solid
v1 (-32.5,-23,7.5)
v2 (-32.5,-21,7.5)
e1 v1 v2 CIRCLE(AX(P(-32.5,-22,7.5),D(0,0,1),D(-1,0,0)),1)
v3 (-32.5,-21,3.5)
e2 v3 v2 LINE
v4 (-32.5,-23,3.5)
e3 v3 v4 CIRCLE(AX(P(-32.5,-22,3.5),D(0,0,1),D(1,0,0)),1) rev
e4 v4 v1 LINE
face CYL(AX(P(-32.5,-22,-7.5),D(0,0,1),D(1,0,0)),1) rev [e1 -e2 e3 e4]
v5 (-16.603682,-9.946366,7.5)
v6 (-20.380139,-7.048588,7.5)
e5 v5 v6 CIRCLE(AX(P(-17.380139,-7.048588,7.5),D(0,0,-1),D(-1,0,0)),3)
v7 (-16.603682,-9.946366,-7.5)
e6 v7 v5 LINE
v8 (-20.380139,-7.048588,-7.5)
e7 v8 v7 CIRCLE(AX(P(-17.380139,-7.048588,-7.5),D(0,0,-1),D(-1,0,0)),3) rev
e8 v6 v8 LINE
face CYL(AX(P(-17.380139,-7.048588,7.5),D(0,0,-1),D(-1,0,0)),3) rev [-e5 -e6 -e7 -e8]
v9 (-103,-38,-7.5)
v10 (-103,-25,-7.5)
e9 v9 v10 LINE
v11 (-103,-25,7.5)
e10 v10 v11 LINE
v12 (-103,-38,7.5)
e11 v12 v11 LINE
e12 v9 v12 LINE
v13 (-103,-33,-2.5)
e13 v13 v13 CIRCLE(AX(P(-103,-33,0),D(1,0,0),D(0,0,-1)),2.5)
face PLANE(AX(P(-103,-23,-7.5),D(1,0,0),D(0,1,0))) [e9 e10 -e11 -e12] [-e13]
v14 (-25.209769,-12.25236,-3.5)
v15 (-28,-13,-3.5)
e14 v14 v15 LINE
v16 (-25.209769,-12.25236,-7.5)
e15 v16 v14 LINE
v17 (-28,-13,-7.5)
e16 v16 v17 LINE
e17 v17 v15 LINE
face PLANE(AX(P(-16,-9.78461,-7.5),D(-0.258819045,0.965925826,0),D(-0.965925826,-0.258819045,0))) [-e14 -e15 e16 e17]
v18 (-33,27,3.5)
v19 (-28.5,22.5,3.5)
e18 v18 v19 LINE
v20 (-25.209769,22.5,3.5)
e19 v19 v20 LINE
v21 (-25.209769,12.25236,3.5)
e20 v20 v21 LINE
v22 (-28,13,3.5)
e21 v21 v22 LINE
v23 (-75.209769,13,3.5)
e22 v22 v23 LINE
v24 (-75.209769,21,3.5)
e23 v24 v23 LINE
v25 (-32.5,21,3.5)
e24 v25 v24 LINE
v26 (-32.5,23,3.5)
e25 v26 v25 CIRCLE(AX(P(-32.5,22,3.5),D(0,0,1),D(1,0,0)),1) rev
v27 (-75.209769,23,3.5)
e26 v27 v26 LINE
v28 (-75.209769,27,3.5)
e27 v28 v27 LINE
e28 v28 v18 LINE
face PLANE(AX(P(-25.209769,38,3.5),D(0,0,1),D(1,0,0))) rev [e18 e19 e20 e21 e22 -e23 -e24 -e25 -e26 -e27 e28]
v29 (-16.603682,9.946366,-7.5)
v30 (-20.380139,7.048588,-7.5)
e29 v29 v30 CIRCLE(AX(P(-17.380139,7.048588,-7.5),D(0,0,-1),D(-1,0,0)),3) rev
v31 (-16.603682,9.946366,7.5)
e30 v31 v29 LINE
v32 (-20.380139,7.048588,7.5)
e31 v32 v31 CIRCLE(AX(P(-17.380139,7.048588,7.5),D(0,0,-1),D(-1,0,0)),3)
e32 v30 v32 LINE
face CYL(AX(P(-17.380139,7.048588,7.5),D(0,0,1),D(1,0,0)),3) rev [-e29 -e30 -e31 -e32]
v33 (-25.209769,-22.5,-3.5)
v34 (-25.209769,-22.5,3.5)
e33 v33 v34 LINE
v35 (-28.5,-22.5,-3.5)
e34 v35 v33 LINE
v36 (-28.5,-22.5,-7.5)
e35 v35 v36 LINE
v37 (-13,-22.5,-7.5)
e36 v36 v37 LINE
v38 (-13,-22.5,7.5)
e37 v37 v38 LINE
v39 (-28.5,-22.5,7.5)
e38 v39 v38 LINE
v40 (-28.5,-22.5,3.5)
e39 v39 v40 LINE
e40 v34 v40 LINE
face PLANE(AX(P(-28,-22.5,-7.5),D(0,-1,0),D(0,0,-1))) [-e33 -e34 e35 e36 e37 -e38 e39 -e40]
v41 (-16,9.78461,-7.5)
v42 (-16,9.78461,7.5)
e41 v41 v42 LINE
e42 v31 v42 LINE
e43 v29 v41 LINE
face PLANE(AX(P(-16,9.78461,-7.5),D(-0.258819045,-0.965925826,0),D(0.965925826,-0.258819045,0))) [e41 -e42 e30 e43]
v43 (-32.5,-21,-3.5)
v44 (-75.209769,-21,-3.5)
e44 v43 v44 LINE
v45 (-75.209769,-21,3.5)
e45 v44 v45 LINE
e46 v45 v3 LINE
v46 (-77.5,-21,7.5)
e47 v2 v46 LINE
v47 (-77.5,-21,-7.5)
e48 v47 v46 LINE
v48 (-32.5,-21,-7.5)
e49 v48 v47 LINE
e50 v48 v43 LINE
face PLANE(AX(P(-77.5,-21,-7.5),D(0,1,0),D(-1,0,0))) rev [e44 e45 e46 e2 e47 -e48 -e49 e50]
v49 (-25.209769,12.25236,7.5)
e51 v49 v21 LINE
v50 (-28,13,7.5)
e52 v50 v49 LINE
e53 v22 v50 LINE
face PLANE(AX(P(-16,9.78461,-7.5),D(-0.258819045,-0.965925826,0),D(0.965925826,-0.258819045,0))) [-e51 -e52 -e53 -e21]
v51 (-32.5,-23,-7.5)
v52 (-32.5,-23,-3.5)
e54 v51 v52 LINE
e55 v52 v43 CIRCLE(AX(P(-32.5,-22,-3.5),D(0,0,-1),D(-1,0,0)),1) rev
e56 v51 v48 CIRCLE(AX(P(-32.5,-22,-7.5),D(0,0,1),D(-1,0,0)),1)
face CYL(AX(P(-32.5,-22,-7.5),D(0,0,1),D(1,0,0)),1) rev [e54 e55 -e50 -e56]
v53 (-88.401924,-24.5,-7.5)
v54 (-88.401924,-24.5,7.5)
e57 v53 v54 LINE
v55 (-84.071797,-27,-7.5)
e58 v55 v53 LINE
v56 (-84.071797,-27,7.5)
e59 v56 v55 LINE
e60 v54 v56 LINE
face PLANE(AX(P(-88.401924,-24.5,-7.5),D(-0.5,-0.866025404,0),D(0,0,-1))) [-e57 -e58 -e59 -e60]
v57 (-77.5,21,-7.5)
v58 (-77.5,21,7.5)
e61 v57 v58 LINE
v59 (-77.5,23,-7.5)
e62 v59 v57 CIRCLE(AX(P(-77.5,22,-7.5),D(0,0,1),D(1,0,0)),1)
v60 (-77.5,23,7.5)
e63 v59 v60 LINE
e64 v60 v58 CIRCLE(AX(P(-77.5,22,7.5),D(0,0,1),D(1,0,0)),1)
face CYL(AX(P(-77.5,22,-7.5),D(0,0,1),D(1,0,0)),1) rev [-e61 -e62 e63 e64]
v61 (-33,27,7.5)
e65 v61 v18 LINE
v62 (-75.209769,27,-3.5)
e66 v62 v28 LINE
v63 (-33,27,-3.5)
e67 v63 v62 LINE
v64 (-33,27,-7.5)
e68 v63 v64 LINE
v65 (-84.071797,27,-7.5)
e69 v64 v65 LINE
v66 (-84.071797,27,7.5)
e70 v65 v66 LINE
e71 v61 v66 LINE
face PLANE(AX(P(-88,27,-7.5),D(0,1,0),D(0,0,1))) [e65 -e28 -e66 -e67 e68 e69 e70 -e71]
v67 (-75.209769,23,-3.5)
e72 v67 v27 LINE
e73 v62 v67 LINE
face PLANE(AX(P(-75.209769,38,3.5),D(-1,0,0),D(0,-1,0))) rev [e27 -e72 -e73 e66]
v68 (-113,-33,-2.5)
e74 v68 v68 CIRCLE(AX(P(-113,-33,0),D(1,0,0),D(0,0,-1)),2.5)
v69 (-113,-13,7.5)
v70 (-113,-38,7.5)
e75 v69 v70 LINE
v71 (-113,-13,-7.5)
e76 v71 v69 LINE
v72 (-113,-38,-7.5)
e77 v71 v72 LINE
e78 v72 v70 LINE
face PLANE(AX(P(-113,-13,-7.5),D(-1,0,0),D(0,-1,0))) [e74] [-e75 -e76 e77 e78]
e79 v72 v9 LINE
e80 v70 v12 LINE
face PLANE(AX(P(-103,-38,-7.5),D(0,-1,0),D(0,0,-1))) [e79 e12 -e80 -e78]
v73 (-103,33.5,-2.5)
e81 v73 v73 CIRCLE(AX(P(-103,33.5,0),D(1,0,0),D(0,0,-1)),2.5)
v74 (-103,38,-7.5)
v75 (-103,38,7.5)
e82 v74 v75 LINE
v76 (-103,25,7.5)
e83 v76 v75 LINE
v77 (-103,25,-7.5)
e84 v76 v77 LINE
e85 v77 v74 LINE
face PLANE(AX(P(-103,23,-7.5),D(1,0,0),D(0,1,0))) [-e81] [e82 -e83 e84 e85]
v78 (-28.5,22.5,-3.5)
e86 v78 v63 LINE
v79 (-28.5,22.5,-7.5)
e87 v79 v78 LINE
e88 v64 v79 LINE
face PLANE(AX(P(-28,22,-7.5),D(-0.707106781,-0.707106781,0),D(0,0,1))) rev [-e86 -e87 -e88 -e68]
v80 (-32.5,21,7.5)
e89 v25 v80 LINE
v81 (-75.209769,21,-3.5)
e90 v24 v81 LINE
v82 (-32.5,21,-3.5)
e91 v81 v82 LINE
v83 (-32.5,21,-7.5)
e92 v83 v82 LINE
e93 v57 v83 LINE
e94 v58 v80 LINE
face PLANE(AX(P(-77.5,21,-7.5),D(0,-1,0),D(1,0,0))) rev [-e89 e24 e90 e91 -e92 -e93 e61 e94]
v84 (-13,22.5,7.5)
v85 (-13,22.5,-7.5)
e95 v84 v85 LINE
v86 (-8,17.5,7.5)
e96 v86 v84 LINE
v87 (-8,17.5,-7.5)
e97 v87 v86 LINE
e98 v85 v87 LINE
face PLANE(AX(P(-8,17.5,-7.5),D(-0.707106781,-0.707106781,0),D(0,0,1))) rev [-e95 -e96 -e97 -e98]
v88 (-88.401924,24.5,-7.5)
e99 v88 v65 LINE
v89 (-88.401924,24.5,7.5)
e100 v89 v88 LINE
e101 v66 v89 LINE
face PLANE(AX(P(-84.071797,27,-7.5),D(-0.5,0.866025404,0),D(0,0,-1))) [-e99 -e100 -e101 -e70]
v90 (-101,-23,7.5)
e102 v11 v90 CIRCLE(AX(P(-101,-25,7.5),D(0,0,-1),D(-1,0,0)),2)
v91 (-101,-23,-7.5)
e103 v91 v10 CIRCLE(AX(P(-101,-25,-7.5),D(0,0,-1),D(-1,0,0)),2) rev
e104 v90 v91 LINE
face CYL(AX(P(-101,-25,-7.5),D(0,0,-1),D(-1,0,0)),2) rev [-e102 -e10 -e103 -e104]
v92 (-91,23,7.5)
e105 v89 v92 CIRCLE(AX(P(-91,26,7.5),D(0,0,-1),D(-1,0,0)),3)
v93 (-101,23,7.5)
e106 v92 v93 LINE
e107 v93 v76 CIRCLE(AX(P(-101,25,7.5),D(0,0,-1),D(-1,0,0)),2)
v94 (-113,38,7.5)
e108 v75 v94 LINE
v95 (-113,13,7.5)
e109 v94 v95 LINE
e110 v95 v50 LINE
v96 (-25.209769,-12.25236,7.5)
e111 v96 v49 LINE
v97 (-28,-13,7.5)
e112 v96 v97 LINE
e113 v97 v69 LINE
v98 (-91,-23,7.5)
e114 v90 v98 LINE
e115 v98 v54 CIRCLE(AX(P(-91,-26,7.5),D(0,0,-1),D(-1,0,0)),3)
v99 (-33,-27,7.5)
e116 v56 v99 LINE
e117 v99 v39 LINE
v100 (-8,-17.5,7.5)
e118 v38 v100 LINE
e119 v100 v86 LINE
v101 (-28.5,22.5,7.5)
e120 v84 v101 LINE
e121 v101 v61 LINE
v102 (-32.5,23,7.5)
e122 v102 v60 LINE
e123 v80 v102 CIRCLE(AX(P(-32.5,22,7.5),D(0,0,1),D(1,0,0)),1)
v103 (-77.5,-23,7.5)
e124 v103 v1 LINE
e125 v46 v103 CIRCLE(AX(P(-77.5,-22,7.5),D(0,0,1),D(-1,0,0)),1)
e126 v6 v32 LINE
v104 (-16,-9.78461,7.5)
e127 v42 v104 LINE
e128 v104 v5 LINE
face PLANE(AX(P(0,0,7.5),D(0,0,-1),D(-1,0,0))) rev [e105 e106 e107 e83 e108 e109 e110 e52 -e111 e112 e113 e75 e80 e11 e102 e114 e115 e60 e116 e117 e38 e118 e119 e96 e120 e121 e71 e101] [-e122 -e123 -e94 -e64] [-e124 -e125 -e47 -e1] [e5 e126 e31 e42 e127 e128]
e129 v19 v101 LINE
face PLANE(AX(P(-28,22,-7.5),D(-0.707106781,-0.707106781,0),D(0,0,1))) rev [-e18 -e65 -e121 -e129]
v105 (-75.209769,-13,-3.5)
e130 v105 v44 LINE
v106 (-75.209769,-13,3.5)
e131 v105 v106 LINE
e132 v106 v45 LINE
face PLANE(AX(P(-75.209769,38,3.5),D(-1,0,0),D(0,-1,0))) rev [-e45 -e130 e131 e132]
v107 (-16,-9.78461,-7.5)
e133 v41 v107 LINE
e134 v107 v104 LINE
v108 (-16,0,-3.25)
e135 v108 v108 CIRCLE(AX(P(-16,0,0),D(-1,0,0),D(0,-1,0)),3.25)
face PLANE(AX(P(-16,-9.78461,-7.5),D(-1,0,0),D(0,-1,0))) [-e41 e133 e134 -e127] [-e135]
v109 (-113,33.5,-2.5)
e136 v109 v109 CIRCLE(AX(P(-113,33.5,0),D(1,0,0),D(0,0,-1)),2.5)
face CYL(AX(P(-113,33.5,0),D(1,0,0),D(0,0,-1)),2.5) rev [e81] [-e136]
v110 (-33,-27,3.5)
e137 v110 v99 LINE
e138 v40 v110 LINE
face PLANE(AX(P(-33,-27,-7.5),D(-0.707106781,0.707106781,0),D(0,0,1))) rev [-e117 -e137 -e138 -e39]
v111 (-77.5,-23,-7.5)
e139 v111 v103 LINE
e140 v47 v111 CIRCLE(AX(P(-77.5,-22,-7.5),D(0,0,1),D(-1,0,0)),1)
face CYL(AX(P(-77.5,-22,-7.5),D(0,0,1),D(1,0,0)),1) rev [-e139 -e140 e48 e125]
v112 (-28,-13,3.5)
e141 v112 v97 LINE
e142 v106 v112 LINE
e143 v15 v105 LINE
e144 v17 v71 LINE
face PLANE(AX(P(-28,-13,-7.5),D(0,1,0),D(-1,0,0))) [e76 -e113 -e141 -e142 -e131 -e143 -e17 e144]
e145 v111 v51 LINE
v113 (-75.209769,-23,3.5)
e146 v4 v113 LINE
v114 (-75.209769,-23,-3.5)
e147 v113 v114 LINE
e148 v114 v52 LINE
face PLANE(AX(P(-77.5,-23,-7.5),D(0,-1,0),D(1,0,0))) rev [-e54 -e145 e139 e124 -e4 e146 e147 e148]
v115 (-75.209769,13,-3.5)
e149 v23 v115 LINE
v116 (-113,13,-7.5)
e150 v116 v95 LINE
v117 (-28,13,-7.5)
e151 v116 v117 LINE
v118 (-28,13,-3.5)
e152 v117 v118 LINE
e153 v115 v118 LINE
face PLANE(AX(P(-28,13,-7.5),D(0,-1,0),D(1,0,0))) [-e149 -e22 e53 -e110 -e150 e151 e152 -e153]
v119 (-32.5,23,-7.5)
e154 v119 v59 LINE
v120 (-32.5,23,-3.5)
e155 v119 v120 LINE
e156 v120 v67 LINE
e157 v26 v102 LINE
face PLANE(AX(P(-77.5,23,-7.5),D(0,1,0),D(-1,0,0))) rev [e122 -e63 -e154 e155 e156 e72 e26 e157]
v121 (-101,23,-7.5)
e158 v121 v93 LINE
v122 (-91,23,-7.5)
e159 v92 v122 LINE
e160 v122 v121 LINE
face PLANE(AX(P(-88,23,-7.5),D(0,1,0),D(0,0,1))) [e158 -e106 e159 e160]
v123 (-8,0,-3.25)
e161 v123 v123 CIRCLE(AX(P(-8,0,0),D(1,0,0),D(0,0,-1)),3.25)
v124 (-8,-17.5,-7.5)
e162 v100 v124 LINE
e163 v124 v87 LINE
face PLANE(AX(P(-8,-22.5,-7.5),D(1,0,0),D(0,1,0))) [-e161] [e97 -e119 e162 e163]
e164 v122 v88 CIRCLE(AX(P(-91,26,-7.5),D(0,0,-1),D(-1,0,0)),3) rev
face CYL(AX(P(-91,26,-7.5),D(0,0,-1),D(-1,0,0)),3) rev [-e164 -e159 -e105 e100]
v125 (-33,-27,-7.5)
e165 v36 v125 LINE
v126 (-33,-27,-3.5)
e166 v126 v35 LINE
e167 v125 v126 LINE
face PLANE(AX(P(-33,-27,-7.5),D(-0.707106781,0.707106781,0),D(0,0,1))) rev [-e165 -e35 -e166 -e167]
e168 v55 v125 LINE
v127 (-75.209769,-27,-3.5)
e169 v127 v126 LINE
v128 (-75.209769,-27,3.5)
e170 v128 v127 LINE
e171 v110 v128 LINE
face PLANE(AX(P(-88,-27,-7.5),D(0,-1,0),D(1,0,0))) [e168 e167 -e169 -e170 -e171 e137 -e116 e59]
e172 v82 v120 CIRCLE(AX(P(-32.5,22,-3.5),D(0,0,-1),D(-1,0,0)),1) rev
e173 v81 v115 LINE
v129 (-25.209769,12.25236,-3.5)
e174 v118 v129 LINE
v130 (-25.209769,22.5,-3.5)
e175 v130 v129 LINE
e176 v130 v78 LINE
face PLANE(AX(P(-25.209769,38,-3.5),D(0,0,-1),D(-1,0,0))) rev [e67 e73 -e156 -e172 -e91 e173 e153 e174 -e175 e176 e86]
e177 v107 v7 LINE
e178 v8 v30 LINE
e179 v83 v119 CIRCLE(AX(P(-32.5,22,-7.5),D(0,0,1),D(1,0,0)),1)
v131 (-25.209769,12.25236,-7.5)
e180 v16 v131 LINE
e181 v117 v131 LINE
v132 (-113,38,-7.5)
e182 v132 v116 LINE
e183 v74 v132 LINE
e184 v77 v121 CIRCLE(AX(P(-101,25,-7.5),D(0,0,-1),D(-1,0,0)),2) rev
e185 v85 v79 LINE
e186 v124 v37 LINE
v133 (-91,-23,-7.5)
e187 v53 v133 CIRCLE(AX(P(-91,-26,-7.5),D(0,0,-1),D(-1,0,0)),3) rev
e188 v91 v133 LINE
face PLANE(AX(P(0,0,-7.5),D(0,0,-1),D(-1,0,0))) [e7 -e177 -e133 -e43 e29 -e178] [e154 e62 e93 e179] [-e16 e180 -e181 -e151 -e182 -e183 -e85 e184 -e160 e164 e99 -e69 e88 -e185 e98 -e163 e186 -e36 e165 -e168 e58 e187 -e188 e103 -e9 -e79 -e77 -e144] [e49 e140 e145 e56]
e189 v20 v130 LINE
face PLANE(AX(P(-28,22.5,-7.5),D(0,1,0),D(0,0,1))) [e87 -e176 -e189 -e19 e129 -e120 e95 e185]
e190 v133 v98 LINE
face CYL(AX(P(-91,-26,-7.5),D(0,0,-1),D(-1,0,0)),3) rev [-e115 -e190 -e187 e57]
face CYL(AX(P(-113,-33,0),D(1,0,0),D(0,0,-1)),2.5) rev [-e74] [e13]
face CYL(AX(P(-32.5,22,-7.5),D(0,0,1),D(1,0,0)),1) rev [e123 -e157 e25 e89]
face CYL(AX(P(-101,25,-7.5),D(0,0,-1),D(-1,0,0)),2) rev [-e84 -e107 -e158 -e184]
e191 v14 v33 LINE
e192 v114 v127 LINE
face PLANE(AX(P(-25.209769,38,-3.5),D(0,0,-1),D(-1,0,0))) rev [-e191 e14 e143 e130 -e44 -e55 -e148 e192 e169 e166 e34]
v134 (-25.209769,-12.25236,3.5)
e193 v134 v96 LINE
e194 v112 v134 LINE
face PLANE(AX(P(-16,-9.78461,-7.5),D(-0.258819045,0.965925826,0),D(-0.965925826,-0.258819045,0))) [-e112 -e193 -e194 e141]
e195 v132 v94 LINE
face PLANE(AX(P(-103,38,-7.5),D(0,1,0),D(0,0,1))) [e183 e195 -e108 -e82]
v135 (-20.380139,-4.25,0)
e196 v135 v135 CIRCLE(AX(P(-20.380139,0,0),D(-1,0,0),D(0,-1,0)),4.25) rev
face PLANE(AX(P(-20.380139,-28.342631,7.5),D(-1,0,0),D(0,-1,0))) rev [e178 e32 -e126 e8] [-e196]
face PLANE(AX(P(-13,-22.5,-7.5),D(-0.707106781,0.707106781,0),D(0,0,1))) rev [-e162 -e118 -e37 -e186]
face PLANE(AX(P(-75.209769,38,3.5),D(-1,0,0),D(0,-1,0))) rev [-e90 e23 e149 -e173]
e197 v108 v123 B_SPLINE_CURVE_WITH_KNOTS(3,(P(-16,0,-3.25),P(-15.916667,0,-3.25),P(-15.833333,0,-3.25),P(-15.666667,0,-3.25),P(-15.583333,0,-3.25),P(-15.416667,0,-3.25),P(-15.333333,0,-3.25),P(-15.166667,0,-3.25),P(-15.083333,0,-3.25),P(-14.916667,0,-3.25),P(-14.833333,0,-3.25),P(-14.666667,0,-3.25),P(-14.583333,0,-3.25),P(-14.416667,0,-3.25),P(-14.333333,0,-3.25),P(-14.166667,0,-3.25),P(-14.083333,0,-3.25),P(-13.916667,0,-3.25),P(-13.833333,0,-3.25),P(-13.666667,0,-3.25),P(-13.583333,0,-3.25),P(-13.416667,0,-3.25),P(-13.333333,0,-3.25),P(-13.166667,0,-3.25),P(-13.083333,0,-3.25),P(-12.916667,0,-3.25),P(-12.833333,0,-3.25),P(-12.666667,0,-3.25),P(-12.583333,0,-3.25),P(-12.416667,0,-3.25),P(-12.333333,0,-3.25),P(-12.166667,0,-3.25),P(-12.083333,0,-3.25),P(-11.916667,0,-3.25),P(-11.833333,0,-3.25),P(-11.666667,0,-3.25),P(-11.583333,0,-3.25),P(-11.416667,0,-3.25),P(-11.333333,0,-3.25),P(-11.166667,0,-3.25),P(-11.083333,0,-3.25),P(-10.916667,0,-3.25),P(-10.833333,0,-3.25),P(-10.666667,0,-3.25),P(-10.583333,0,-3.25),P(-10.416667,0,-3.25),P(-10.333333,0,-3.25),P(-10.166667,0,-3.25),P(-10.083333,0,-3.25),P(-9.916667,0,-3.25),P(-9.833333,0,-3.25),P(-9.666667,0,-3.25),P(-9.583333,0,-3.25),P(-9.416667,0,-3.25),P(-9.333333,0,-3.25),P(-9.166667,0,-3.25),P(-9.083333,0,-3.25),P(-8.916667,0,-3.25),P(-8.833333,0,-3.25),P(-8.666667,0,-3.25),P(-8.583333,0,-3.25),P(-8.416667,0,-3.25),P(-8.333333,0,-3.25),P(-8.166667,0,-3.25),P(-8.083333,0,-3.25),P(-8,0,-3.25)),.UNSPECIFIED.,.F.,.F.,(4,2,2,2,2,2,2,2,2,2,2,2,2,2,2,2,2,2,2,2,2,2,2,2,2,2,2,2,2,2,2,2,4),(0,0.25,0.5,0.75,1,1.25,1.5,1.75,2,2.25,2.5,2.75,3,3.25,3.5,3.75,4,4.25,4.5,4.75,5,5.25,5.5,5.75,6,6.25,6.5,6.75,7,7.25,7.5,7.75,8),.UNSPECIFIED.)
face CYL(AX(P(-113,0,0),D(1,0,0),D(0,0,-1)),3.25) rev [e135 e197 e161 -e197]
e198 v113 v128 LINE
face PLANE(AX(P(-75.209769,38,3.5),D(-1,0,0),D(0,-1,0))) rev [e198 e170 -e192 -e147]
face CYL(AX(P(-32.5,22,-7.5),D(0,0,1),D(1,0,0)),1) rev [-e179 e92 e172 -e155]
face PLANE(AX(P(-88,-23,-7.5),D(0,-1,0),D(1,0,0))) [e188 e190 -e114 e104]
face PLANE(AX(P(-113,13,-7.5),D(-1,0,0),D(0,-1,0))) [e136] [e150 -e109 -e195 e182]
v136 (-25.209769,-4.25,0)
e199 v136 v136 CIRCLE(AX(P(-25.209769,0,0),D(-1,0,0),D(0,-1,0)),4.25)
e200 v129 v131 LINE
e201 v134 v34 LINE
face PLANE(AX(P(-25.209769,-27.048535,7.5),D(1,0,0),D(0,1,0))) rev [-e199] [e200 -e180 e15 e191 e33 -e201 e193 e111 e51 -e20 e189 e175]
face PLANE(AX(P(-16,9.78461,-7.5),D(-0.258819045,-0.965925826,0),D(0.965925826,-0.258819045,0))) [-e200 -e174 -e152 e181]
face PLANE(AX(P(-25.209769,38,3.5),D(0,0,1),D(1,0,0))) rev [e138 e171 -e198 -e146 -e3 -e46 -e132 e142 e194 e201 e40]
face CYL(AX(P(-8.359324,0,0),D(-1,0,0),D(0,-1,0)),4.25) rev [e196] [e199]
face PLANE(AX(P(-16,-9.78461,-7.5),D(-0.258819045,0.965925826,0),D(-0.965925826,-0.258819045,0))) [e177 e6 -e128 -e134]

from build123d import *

# Parameters (mm, degrees)
BOSS_EXTRUDE1_DEPTH     = 7.5
SKETCH2_R               = 3.25
CUT_EXTRUDE1_DEPTH      = 112.91626334
FILLET1_R               = 2
SKETCH3_R               = 2.5
CUT_EXTRUDE2_DEPTH      = 103.592641062
CUT_EXTRUDE4_DEPTH      = 121.158229015
BOSS_EXTRUDE2_REACH     = 128.857
SKETCH7_W               = 5
SKETCH7_H               = 15
FILLET2_R               = 3
SKETCH8_R               = 4.25
CUT_EXTRUDE6_DEPTH      = 4.829629131
CUT_EXTRUDE3_DEPTH      = 125.202455692
CUT_EXTRUDE3_DEPTH_BACK = 125.202455692
SKETCH4_W               = 50
SKETCH4_H               = 7
CHAMFER1_START          = -7.5
CHAMFER1_DEPTH          = 15
CHAMFER2_SIZE           = 5


with BuildPart() as part:
    # Sketch1 → Boss-Extrude1 (new, symmetric)
    with BuildSketch(Plane.XY):
        Polygon((-28, 13), (-113, 13), (-113, 38), (-103, 38), (-103, 23), (-88, 23), (-88, 27), (-28, 27), (-28, 22.5), (-8, 22.5), (-8, -22.5), (-28, -22.5), (-28, -27), (-88, -27), (-88, -23), (-103, -23), (-103, -38), (-113, -38), (-113, -13), (-28, -13), (-16, -9.784609691), (-16, 9.784609691), align=None)
    extrude(amount=BOSS_EXTRUDE1_DEPTH, both=True)

    # Sketch2 → Cut-Extrude1 (cut, through all)
    with BuildSketch(Plane(origin=(-8, 0, 0), x_dir=(0, 0, -1), z_dir=(1, 0, 0))):
        Circle(SKETCH2_R)
    extrude(amount=-CUT_EXTRUDE1_DEPTH, mode=Mode.SUBTRACT)

    # Fillet1
    fillet1_edges = [part.edges().sort_by_distance(p)[0] for p in [
        (-103, -23, 0),
        (-103, 23, 0),
    ]]
    fillet(fillet1_edges, radius=FILLET1_R)

    # Sketch3 → Cut-Extrude2 (cut, through all)
    with BuildSketch(Plane(origin=(-103, 0, 0), x_dir=(0, 0, -1), z_dir=(1, 0, 0))):
        with Locations((0, 33.5)):
            Circle(SKETCH3_R)
        with Locations((0, -33)):
            Circle(SKETCH3_R)
    extrude(amount=-CUT_EXTRUDE2_DEPTH, mode=Mode.SUBTRACT)

    # Sketch5 → Cut-Extrude4 (cut, through all)
    with BuildSketch(Plane.XY.offset(7.5)):
        with BuildLine():
            Line((-77.5, 23.000000001), (-32.5, 23.000000001))
            ThreePointArc((-32.5, 23.000000001), (-31.5, 22.000000001), (-32.5, 21.000000001))
            Line((-32.5, 21.000000001), (-77.5, 21.000000001))
            ThreePointArc((-77.5, 21.000000001), (-78.5, 22.000000001), (-77.5, 23.000000001))
        make_face()
        with BuildLine():
            Line((-77.5, -23.000000001), (-32.5, -23.000000001))
            ThreePointArc((-32.5, -23.000000001), (-31.5, -22.000000001), (-32.5, -21.000000001))
            Line((-32.5, -21.000000001), (-77.5, -21.000000001))
            ThreePointArc((-77.5, -21.000000001), (-78.5, -22.000000001), (-77.5, -23.000000001))
        make_face()
    extrude(amount=-CUT_EXTRUDE4_DEPTH, mode=Mode.SUBTRACT)

    # Boss-Extrude2: up to this plane
    boss_extrude2_end = Plane(origin=(-16, -9.784609691, -7.5), z_dir=(-0.25881904510251796, 0.9659258262890691, 0))
    # Sketch7 → Boss-Extrude2 (add, up to the surface)
    with BuildSketch(Plane(origin=(1.374355653, 5.129165125, 0), x_dir=(-0.9659258262890691, 0.25881904510251813, 0), z_dir=(-0.25881904510251813, -0.9659258262890691, 0)), mode=Mode.PRIVATE) as boss_extrude2_sk1:
        with Locations((25.021910533, 0)):
            Rectangle(SKETCH7_W, SKETCH7_H)
    boss_extrude2_tool1 = split(extrude(boss_extrude2_sk1.sketch, amount=BOSS_EXTRUDE2_REACH, dir=(0, -1, 0), mode=Mode.PRIVATE), bisect_by=boss_extrude2_end, keep=Keep.BOTH, mode=Mode.PRIVATE)
    add(boss_extrude2_tool1.solids().sort_by_distance((-22.794954, 11.605312, 0))[0])

    # Fillet2
    fillet2_edges = [part.edges().sort_by_distance(p)[0] for p in [
        (-20.380139389, -10.958264503, 0),
        (-20.380139389, 10.958264503, 0),
        (-88, -23, 0),
        (-88, 23, 0),
    ]]
    fillet(fillet2_edges, radius=FILLET2_R)

    # Sketch8 → Cut-Extrude6 (cut)
    with BuildSketch(Plane.ZY.offset(25.20976852)):
        with Locations(Location((0, 0, 0), (0, 0, 270))):
            Circle(SKETCH8_R)
    extrude(amount=-CUT_EXTRUDE6_DEPTH, mode=Mode.SUBTRACT)

    # Sketch4 → Cut-Extrude3 (cut, two sides: drawn at the far end of the back side and taken through both)
    with BuildSketch(Plane(origin=(0, 13, 0), x_dir=(-1, 0, 0), z_dir=(0, -1, 0)).offset(-CUT_EXTRUDE3_DEPTH_BACK)):
        with Locations((50.20976852, 0)):
            Rectangle(SKETCH4_W, SKETCH4_H)
    extrude(amount=CUT_EXTRUDE3_DEPTH + CUT_EXTRUDE3_DEPTH_BACK, mode=Mode.SUBTRACT)

    # Chamfer1: read off the stored shape, not the designer's step
    # Chamfer1 outline → Chamfer1 (cut)
    with BuildSketch(Plane.XY.offset(CHAMFER1_START)):
        Polygon((-28, 27), (-33, 27), (-28.5, 22.5), (-28, 22.5), align=None)
        with BuildLine():
            Line((-88.401923788, 24.5), (-84.07179677, 27))
            Line((-84.07179677, 27), (-88, 27))
            Line((-88, 27), (-88, 26))
            ThreePointArc((-88, 26), (-88.102222521, 25.223542864), (-88.401923788, 24.5))
        make_face()
        Polygon((-28.5, -22.5), (-33, -27), (-28, -27), (-28, -22.5), align=None)
        with BuildLine():
            Line((-84.07179677, -27), (-88.401923788, -24.5))
            ThreePointArc((-88.401923788, -24.5), (-88.102222521, -25.223542864), (-88, -26))
            Line((-88, -26), (-88, -27))
            Line((-88, -27), (-84.07179677, -27))
        make_face()
    extrude(amount=CHAMFER1_DEPTH, mode=Mode.SUBTRACT)

    # Chamfer2
    chamfer2_edges = [part.edges().sort_by_distance(p)[0] for p in [
        (-8, 22.5, 0),
        (-8, -22.5, 0),
    ]]
    chamfer(chamfer2_edges, length=CHAMFER2_SIZE)


solid = part.part
